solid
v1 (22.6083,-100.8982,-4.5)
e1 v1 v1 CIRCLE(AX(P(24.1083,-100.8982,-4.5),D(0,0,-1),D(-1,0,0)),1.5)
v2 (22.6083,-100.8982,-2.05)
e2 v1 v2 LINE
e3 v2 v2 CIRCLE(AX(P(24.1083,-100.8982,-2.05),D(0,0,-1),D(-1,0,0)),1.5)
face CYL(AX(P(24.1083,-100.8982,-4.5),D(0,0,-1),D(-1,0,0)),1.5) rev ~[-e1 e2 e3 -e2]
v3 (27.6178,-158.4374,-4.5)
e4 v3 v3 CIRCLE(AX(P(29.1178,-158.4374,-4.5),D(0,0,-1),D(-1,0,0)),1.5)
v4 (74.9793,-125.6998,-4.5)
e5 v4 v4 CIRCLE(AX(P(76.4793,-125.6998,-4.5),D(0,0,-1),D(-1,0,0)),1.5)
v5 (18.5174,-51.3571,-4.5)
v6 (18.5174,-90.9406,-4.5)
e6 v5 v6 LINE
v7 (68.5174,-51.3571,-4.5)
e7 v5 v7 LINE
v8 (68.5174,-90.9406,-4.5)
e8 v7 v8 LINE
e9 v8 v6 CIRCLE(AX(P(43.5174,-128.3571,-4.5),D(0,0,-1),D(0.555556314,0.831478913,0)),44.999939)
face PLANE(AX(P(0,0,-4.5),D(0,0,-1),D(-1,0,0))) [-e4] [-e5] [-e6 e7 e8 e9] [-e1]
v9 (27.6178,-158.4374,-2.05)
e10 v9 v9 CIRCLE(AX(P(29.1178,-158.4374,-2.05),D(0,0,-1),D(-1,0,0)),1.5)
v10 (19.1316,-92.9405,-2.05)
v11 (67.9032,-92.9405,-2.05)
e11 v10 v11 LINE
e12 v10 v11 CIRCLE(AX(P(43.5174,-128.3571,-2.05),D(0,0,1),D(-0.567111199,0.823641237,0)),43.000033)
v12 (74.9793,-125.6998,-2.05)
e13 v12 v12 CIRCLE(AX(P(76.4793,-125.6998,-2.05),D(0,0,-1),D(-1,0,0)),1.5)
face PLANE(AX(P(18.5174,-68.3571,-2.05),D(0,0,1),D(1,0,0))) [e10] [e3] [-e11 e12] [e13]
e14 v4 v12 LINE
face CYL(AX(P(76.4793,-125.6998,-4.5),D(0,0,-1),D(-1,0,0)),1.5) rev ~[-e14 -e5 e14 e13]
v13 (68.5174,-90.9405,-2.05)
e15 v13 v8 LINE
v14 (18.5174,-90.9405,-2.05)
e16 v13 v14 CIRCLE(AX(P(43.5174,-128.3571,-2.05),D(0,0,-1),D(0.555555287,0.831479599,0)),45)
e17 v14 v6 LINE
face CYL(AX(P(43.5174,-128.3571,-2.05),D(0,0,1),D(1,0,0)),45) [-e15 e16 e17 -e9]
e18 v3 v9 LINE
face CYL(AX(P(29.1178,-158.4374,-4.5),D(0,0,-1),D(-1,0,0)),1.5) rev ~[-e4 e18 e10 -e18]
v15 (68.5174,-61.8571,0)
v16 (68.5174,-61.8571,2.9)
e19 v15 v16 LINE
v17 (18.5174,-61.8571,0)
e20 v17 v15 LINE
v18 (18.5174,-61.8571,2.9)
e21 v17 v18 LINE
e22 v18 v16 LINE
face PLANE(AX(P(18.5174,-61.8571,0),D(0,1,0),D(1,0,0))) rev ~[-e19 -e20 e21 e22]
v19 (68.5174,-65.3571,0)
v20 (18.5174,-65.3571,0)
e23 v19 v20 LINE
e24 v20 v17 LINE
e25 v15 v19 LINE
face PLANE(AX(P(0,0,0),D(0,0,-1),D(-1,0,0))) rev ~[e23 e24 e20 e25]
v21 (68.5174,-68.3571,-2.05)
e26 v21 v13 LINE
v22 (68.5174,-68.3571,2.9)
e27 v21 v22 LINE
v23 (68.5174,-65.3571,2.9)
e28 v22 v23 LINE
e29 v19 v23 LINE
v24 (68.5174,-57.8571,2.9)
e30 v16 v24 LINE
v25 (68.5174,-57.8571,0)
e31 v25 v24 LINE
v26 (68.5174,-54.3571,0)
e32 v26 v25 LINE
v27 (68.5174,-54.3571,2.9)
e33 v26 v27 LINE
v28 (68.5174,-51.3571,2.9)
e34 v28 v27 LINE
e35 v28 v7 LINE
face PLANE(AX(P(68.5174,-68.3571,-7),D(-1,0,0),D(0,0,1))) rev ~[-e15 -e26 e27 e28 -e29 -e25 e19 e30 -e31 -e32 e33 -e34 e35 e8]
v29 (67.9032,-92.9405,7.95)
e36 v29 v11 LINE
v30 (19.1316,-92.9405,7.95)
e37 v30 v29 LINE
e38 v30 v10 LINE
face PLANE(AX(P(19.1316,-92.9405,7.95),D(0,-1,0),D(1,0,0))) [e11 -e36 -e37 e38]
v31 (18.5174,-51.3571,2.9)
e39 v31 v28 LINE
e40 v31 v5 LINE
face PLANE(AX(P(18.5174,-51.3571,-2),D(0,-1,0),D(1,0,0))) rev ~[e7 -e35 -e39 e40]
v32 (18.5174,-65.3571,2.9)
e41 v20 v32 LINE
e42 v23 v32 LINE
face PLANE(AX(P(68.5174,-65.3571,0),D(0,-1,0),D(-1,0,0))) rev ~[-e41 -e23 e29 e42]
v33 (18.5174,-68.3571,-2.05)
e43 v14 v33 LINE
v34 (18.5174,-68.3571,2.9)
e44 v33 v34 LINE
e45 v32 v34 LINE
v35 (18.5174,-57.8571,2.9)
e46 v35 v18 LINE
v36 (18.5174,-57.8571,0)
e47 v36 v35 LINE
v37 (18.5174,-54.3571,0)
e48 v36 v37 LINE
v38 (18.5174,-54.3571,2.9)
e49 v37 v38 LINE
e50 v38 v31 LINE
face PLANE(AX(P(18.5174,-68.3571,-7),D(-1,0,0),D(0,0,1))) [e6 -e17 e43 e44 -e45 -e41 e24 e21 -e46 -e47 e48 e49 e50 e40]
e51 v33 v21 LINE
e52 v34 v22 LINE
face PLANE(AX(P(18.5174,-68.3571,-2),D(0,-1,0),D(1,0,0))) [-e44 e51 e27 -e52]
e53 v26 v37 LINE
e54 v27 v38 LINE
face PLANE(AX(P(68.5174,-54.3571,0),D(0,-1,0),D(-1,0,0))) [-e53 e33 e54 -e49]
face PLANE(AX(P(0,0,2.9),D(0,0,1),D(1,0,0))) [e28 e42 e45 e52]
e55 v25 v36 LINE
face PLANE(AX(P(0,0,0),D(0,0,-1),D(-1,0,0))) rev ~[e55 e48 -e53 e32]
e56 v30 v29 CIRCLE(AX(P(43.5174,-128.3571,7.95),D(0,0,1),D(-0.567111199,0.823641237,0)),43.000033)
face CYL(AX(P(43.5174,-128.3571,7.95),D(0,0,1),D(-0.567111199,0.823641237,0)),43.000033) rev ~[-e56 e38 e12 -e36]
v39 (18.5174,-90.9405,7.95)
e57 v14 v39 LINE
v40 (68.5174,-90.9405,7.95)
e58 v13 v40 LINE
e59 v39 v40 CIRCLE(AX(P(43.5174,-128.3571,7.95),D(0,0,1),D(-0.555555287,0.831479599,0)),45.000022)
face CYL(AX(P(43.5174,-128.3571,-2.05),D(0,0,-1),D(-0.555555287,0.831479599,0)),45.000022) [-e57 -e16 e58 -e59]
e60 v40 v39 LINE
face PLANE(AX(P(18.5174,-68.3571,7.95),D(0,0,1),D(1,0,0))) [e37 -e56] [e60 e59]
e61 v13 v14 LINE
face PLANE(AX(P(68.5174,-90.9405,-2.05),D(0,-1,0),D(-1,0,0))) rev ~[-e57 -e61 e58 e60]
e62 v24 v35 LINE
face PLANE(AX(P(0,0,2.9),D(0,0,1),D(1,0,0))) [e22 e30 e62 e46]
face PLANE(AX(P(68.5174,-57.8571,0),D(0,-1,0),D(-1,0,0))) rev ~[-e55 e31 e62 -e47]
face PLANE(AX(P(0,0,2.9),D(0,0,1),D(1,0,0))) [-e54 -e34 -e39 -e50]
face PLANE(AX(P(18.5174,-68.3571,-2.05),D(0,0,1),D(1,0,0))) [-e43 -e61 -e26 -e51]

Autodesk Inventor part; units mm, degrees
ref_plane "YZ Plane" through (0, 0, 0) normal (1, 0, 0) x (0, 1, 0)
ref_plane "XZ Plane" through (0, 0, 0) normal (0, 1, 0) x (-1, 0, 0)
ref_plane "XY Plane" through (0, 0, 0) normal (0, 0, 1) x (1, 0, 0)
sketch "Esquisse1" plane through (0, 0, 0) normal (0, 0, 1) x (1, 0, 0)
  line L0 (-65.5174, -57.3571) -> (-65.5174, -54.3571) construction
  line L1 (-65.5174, -57.3571) -> (68.5174, -57.3571) construction
  line L2 (68.5174, -54.3571) -> (68.5174, -57.3571) construction
  line L3 (68.5174, -54.3571) -> (-65.5174, -54.3571) construction
  line L4 (-65.5174, -65.3571) -> (-65.5174, -62.3571) construction
  line L5 (-65.5174, -65.3571) -> (68.5174, -65.3571) construction
  line L6 (68.5174, -62.3571) -> (68.5174, -65.3571) construction
  line L7 (68.5174, -62.3571) -> (-65.5174, -62.3571) construction
  line L8 (68.5174, -54.3571) -> (-65.5174, -65.3571) construction
  line L9 (-65.5174, -54.3571) -> (68.5174, -65.3571) construction
  line L10 (-65.5174, -61.8571) -> (68.5174, -61.8571)
  line L11 (68.5174, -61.8571) -> (68.5174, -57.8571)
  line L12 (68.5174, -57.8571) -> (-65.5174, -57.8571)
  line L13 (-65.5174, -57.8571) -> (-65.5174, -61.8571)
  line L14 (-65.5174, -61.8571) -> (68.5174, -57.8571) construction
  line L15 (68.5174, -61.8571) -> (-65.5174, -57.8571) construction
  line L16 (68.5174, -54.3571) -> (18.5174, -54.3571)
  line L17 (18.5174, -54.3571) -> (18.5174, -51.3571)
  line L18 (18.5174, -51.3571) -> (68.5174, -51.3571)
  line L19 (68.5174, -51.3571) -> (68.5174, -54.3571)
  line L20 (68.5174, -65.3571) -> (18.5174, -65.3571)
  line L21 (18.5174, -65.3571) -> (18.5174, -68.3571)
  line L22 (18.5174, -68.3571) -> (68.5174, -68.3571)
  line L23 (68.5174, -68.3571) -> (68.5174, -65.3571)
  line L24 (18.5174, -57.8571) -> (18.5174, -61.8571)
  point P0 (0, 0)
  point P1 (1.5, -59.8571)
  dimension "d1" = 0.5
  dimension "d2" = 50
  dimension "d3" = 3
  dimension "d4" = 3
extrude "Extrusion1" add sketch "Esquisse1" along normal blind 2.9 contours L24 L12 L11 L10 | L16 L17 L18 L19 | L23 L22 L21 L20
sketch "Esquisse13" plane through (0, 0, 0) normal (0, 0, -1) x (-1, 0, 0)
  line L0 (-68.5174, -68.3571) -> (-68.5174, -65.3571) projected
  line L1 (-18.5174, -51.3571) -> (-68.5174, -51.3571)
  line L2 (-68.5174, -51.3571) -> (-68.5174, -68.3571)
  line L3 (-68.5174, -68.3571) -> (-18.5174, -68.3571)
  line L4 (-18.5174, -68.3571) -> (-18.5174, -51.3571)
  point P0 (0, 0)
extrude "Extrusion12" add sketch "Esquisse13" along normal blind 2
sketch "Esquisse24" plane through (0, 0, -2) normal (0, 0, -1) x (-1, 0, 0)
  line L0 (-18.5174, -65.3571) -> (-18.5174, -68.3571) projected
  line L1 (-18.5174, -51.3571) -> (-68.5174, -51.3571) projected
  line L2 (-18.5174, -68.3571) -> (-68.5174, -68.3571)
  line L3 (-68.5174, -68.3571) -> (-68.5174, -51.3571)
  line L4 (-68.5174, -51.3571) -> (-18.5174, -51.3571)
  line L5 (-18.5174, -51.3571) -> (-18.5174, -68.3571)
  point P0 (0, 0)
extrude "Extrusion21" add sketch "Esquisse24" along normal blind 5
sketch "Esquisse25" plane through (18.5174, -68.3571, 2.9) normal (0, -1, 0) x (1, 0, 0)
  line L0 (50, -9.9) -> (50, 0) projected
  line L1 (50, -9.9) -> (0, -9.9)
  line L2 (0, -9.9) -> (0, -4.95)
  line L3 (0, -4.95) -> (50, -4.95)
  line L4 (50, -4.95) -> (50, -9.9)
  line L5 (0, -9.9) -> (0, 0) construction
  point P0 (-18.5174, -2.9)
extrude "Extrusion22" add sketch "Esquisse25" along normal blind 15
sketch "Esquisse26" plane through (18.5174, -68.3571, -2.05) normal (0, 0, 1) x (1, 0, 0)
  line L0 (50, -15) -> (0, -15) projected
  line L1 (0, 0) -> (50, 0) projected
  line L2 (0, -15) -> (50, 0)
  line L3 (0, 0) -> (50, -15)
  line L4 (25, -7.5) -> (25, -60)
  circle A0 centre (25, -60) radius 45
  line L5 (0, -15) -> (50, -15) projected
  line L6 (0, -15) -> (0, -22.5834)
  line L7 (50, 0) -> (50, -15) projected
  line L8 (50, -15) -> (50, -22.5834)
  line L9 (0, -15) -> (25, -15)
  line L10 (25, -15) -> (50, -15)
  point P0 (-18.5174, 68.3571)
  dimension "d89" = 90
extrude "Extrusion23" add sketch "Esquisse26" against normal up to surface (4.95 mm away) contours L8 A0 L0 | A0 L6 L0 | A0
sketch "Esquisse27" plane through (0, 0, -7) normal (0, 0, -1) x (-1, 0, 0)
  line L0 (-18.5174, -51.3571) -> (-18.5174, -90.9406) projected
  line L1 (-18.5174, -51.3571) -> (-68.5174, -51.3571) projected
  line L2 (-68.5174, -51.3571) -> (-68.5174, -90.9406) projected
  arc A0 (-68.5174, -90.9406) -> (-18.5174, -90.9406) centre (-43.5174, -128.3571) ccw projected
  point P0 (0, 0)
extrude "Extrusion24" cut sketch "Esquisse27" against normal blind 2.5
sketch "Esquisse28" plane through (18.5174, -68.3571, -2.05) normal (0, 0, 1) x (1, 0, 0)
  arc A0 (0, -22.5834) -> (50, -22.5834) centre (25, -60) ccw construction
  line L0 (25, -60) -> (-20, -60)
  point P0 (-18.5174, 68.3571)
ref_plane "Plan de construction5" through (43.5174, -128.3571, -2.05) normal (0, -1, 0) x (1, 0, 0)
ref_plane "Plan de construction6" through (43.5174, -128.3571, -2.05) normal (-1, 0, 0) x (0, -1, 0)
sketch "Esquisse29" plane through (0, 0, -4.5) normal (0, 0, -1) x (-1, 0, 0)
  circle A0 centre (-29.1178, -158.4374) radius 1.5 projected
  circle A1 centre (-24.1083, -100.8982) radius 1.5 projected
  circle A2 centre (-76.4793, -125.6998) radius 1.5 projected
  point P0 (0, 0)
extrude "Extrusion25" cut sketch "Esquisse29" against normal blind 15
sketch "Esquisse30" plane through (18.5174, -68.3571, -2.05) normal (0, 0, 1) x (1, 0, 0)
  circle A0 centre (57.9619, -57.3427) radius 1.5 projected
  circle A1 centre (10.6003, -90.0802) radius 1.5 projected
  circle A2 centre (5.5909, -32.541) radius 1.5 projected
  line L0 (0, 0) -> (50, 0) projected
  line L1 (0, 0) -> (0, -22.5834) projected
  arc A3 (0, -22.5834) -> (50, -22.5834) centre (25, -60) ccw projected
  line L2 (50, 0) -> (50, -22.5834) projected
  line L3 (50, -22.5834) -> (50, 17) projected
  line L4 (50, -22.5834) -> (0, -22.5834)
  point P0 (-18.5174, 68.3571)
  point P1 (0, -22.5834)
extrude "Extrusion26" add sketch "Esquisse30" along normal blind 10 contours L4 A3
sketch "Esquisse31" plane through (0, 0, -4.5) normal (0, 0, -1) x (-1, 0, 0)
  line L0 (-97.6483, -128.3571) -> (22.3325, -128.3571) projected
  line L1 (-43.5174, -178.8817) -> (-43.5174, -79.6766) projected
  circle A0 centre (-43.5174, -128.3571) radius 43
  arc A1 (-68.5174, -90.9406) -> (-18.5174, -90.9406) centre (-43.5174, -128.3571) ccw projected
  line L2 (-68.5174, -68.3571) -> (-68.5174, -90.9406) projected
  line L3 (-68.5174, -90.9406) -> (-18.5174, -90.9406)
  point P0 (0, 0)
  point P1 (-64.707, -90.9406)
  point P2 (-22.3278, -90.9406)
  dimension "d98" = 2
sketch "Esquisse34" plane through (18.5174, -68.3571, 7.95) normal (0, 0, 1) x (1, 0, 0)
  arc A0 (0, -22.5834) -> (50, -22.5834) centre (25, -60) ccw projected
  line L0 (50, -22.5834) -> (0, -22.5834) projected
  circle A1 centre (5.5909, -32.541) radius 1.5 projected
  circle A2 centre (10.6003, -90.0802) radius 1.5 projected
  circle A3 centre (57.9619, -57.3427) radius 1.5 projected
  arc A4 (0.6142, -24.5834) -> (49.3858, -24.5834) centre (25, -60) ccw
  line L1 (0.6142, -24.5834) -> (49.3858, -24.5834)
  point P0 (-18.5174, 68.3571)
  dimension "d103" = 2
extrude "Extrusion29" cut sketch "Esquisse34" against normal blind 10 contours L1 A4
sketch "Esquisse35" plane through (43.5174, -128.3571, -2.05) normal (-1, 0, 0) x (0, -1, 0)
  line L0 (0, 9.1389) -> (0, 21.1265) construction
  circle A0 centre (0, 15.1327) radius 2
  point P0 (-128.3571, 2.05)
  dimension "d106" = 4
properties part number "rainHolder_Impression 3D"
